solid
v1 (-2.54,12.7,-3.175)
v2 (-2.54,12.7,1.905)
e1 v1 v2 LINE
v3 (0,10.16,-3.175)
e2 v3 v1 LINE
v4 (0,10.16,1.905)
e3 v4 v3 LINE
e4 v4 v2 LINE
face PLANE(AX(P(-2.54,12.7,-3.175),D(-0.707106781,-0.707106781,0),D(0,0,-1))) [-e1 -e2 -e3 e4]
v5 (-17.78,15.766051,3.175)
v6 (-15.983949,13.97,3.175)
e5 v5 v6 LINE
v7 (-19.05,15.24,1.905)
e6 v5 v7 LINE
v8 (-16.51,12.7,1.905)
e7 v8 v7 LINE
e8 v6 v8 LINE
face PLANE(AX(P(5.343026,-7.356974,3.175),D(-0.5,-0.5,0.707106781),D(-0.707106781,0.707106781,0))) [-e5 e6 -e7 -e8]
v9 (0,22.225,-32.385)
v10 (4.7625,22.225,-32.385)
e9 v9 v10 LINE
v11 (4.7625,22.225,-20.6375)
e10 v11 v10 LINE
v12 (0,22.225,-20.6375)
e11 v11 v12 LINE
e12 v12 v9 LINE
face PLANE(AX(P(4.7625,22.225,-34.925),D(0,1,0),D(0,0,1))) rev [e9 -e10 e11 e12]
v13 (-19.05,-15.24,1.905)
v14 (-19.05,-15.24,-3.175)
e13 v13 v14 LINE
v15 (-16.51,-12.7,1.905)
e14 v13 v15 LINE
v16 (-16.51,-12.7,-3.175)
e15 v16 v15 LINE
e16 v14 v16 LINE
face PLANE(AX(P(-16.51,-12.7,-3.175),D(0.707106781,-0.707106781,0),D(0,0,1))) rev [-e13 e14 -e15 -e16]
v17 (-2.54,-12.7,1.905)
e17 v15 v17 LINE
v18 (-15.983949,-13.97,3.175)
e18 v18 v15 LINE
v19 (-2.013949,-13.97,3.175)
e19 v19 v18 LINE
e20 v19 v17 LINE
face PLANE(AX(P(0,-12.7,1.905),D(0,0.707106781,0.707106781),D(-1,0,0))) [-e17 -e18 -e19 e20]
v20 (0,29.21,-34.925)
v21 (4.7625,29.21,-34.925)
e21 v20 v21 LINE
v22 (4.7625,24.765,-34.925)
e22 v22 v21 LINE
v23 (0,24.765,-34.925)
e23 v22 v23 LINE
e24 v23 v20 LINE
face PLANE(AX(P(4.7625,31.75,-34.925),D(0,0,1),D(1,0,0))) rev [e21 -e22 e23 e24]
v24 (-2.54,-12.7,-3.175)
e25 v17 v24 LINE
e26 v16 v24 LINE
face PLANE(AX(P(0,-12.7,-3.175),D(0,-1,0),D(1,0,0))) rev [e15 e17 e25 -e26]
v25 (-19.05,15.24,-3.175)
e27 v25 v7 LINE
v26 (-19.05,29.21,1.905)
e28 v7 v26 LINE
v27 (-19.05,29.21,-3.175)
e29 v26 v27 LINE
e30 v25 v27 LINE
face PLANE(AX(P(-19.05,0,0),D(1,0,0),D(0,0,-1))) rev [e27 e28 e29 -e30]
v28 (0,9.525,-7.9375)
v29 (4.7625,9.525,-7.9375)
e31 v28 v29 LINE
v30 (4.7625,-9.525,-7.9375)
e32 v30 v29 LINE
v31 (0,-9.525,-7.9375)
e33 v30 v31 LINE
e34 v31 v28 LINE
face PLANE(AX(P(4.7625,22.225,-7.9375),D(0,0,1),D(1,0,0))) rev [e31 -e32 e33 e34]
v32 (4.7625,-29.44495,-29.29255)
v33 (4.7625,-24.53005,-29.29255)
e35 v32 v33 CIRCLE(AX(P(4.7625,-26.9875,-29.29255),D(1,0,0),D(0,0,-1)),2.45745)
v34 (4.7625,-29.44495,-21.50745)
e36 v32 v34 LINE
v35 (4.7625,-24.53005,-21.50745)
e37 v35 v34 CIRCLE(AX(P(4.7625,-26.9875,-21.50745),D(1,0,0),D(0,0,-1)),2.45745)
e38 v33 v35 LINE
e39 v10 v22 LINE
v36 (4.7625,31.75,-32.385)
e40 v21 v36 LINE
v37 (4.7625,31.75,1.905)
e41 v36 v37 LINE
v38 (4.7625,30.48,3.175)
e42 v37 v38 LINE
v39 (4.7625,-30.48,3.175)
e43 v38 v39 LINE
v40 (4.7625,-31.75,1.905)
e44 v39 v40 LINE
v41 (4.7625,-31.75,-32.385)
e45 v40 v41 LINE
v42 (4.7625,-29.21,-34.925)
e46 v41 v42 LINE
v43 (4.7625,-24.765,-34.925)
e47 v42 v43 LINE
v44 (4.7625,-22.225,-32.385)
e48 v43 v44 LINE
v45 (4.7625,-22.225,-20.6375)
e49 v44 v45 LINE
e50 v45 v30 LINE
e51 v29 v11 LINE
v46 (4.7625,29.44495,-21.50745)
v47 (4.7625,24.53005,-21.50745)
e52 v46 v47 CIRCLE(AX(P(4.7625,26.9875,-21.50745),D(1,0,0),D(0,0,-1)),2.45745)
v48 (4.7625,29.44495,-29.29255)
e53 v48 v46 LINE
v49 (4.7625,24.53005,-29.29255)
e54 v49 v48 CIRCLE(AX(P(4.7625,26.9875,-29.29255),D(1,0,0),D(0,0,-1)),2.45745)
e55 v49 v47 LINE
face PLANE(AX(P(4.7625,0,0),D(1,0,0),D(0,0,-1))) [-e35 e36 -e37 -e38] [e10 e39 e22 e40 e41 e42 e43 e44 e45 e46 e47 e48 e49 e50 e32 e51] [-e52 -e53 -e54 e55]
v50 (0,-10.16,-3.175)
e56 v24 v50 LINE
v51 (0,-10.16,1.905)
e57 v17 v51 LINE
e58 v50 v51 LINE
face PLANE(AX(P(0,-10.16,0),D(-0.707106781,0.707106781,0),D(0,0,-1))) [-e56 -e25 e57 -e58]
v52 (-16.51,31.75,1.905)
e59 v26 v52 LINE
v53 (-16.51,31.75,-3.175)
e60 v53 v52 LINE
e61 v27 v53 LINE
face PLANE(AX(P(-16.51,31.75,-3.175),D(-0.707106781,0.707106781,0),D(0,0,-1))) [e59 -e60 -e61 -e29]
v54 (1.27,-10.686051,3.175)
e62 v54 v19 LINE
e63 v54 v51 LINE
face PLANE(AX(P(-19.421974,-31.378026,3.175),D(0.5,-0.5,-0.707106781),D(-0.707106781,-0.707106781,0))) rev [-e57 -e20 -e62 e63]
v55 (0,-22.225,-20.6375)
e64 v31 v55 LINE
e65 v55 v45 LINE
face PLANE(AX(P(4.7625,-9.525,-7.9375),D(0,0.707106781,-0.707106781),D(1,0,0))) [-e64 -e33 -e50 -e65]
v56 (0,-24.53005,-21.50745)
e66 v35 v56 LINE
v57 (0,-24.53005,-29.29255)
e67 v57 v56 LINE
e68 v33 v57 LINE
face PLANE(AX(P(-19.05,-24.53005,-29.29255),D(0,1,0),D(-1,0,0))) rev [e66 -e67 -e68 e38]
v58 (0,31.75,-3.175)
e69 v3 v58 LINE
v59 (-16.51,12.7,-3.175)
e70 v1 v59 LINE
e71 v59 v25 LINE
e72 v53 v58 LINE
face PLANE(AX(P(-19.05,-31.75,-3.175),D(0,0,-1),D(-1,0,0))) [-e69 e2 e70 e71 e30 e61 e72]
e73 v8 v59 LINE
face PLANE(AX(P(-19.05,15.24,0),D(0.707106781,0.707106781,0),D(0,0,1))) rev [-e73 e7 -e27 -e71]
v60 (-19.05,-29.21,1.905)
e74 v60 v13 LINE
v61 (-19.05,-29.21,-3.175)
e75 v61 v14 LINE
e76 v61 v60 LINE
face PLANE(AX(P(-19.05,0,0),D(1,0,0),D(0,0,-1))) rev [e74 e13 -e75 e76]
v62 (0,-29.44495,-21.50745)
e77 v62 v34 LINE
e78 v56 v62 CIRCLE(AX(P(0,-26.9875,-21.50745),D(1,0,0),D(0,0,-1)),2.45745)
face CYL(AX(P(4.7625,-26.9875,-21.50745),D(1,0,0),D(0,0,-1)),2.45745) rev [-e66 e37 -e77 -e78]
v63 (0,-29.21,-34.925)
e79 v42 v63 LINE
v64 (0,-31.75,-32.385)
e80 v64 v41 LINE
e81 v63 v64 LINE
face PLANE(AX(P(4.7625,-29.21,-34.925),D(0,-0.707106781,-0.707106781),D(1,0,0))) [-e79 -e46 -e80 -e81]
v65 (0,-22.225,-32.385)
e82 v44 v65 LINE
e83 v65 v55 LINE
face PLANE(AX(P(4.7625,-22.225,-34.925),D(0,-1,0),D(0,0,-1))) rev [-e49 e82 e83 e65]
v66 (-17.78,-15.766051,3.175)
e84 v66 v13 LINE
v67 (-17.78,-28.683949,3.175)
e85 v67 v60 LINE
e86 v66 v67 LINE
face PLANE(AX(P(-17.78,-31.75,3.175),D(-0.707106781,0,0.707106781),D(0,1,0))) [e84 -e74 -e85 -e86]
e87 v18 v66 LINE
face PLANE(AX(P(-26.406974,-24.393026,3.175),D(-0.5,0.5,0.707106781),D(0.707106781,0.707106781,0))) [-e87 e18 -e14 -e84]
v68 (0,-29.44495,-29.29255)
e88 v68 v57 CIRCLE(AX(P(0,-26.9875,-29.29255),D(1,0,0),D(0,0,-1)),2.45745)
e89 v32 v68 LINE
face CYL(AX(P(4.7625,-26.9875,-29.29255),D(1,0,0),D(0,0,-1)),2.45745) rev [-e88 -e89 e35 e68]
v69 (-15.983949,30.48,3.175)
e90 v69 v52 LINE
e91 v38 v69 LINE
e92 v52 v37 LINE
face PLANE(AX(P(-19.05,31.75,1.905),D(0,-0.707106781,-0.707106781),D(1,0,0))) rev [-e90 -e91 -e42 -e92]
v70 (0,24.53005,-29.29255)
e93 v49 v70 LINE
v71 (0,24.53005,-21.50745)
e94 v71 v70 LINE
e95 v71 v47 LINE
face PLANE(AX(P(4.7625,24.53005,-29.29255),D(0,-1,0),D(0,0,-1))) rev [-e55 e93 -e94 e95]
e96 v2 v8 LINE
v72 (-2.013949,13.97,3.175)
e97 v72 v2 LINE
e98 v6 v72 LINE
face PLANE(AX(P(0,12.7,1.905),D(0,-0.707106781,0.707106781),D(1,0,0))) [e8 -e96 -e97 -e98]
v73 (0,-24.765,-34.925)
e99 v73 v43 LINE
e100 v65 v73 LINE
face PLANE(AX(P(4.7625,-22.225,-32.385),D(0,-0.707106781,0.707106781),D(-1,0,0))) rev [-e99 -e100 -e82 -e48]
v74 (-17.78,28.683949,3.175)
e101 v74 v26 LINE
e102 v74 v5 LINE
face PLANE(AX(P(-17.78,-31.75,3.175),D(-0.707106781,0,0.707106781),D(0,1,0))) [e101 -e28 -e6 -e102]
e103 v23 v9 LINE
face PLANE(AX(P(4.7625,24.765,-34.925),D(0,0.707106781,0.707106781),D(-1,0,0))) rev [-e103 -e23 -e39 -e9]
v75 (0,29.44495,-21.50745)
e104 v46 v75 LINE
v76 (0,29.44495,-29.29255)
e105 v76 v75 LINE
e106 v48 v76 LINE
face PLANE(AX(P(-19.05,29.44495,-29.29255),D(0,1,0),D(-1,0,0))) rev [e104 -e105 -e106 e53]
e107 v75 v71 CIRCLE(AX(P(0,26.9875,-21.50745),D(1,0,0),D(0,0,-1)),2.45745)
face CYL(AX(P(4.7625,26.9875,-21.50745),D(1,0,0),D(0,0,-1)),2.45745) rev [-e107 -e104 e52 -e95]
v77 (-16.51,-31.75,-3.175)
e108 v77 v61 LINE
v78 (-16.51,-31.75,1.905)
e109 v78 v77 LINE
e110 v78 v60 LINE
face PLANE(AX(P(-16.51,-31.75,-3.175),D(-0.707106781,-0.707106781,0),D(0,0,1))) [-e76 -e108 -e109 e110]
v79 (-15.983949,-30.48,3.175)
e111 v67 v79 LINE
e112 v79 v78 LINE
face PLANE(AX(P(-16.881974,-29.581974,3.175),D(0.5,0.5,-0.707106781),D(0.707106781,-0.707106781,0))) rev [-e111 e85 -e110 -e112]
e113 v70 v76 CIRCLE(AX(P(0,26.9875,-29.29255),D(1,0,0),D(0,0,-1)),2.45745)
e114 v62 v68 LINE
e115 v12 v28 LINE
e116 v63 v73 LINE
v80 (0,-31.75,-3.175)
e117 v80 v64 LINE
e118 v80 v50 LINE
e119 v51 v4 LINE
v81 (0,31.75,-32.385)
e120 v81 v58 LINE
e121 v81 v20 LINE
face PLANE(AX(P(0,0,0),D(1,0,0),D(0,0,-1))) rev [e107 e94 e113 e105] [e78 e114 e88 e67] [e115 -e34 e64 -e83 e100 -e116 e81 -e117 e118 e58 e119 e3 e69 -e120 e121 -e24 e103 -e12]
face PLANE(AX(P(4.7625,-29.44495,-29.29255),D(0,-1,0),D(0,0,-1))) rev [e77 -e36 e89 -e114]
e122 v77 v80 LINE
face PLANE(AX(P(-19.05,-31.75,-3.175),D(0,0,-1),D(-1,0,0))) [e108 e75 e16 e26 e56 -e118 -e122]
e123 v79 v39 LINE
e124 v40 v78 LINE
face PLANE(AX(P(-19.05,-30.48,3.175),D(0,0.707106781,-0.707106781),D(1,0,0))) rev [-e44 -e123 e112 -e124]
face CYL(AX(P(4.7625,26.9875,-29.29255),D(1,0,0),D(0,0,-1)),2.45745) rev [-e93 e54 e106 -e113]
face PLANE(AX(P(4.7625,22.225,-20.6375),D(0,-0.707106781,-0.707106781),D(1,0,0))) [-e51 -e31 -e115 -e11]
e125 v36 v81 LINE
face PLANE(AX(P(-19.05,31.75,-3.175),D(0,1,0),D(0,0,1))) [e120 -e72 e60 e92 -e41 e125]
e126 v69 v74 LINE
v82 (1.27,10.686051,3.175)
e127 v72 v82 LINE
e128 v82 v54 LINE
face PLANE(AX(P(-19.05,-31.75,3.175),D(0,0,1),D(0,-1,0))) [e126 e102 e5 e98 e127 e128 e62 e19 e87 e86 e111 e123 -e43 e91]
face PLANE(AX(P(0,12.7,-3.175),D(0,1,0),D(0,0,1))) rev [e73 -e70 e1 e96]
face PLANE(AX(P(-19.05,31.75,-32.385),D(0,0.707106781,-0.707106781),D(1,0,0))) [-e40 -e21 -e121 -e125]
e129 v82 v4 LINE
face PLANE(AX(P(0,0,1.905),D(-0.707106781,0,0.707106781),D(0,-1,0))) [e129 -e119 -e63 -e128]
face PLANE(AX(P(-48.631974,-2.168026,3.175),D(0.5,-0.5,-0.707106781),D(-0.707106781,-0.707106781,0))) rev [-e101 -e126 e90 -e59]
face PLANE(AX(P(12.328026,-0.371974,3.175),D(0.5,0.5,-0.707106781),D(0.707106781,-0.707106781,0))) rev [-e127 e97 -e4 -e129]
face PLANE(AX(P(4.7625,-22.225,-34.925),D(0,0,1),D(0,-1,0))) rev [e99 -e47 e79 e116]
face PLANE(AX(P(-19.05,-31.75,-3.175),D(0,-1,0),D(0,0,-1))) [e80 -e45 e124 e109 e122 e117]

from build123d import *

# Parameters (mm, degrees)
SKETCH1_W                 = 6.35
SKETCH1_H                 = 63.5
BOSS_EXTRUDE1_DEPTH       = 19.05
BOSS_EXTRUDE2_DEPTH       = 4.7625
SKETCH4_W                 = 19.05
SKETCH4_H                 = 25.4
CUT_EXTRUDE1_DEPTH        = 6.35
CHAMFER1_SIZE             = 12.7
CHAMFER2_SIZE             = 2.54
CHAMFER3_SIZE             = 1.27
F_8_CLEARANCE_SLOT1_DEPTH = 4.7625


# Read off the part's stored shape, not the designer's step: #8 Clearance Slot1
with BuildPart() as part:
    # Sketch1 → Boss-Extrude1 (new body)
    with BuildSketch(Plane(origin=(0, 0, 0), x_dir=(0, 0, -1), z_dir=(1, 0, 0))):
        Rectangle(SKETCH1_W, SKETCH1_H)
    extrude(amount=-BOSS_EXTRUDE1_DEPTH)

    # Sketch2 → Boss-Extrude2 (add)
    with BuildSketch(Plane(origin=(0, 0, 0), x_dir=(0, 0, -1), z_dir=(1, 0, 0))):
        Polygon((-3.175, 31.75), (34.925, 31.75), (34.925, 22.225), (7.9375, 22.225), (7.9375, -22.225), (34.925, -22.225), (34.925, -31.75), (-3.175, -31.75), align=None)
    extrude(amount=BOSS_EXTRUDE2_DEPTH)

    # Sketch4 → Cut-Extrude1 (cut)
    with BuildSketch(Plane.XY.offset(3.175)):
        with Locations((-9.525, 0)):
            Rectangle(SKETCH4_W, SKETCH4_H)
    extrude(amount=-CUT_EXTRUDE1_DEPTH, mode=Mode.SUBTRACT)

    # Chamfer1
    chamfer1_edges = [part.edges().sort_by_distance(p)[0] for p in [
        (2.38125, -22.225, -7.9375),
        (2.38125, 22.225, -7.9375),
    ]]
    chamfer(chamfer1_edges, length=CHAMFER1_SIZE)

    # Chamfer2
    chamfer2_edges = [part.edges().sort_by_distance(p)[0] for p in [
        (-19.05, 31.75, 0),
        (2.38125, -31.75, -34.925),
        (2.38125, -22.225, -34.925),
        (2.38125, 22.225, -34.925),
        (2.38125, 31.75, -34.925),
        (-19.05, -12.7, 0),
        (-19.05, 12.7, 0),
        (0, 12.7, 0),
        (0, -12.7, 0),
        (-19.05, -31.75, 0),
    ]]
    chamfer(chamfer2_edges, length=CHAMFER2_SIZE)

    # Chamfer3
    chamfer3_edges = [part.edges().sort_by_distance(p)[0] for p in [
        (-9.525, 12.7, 3.175),
        (0, 0, 3.175),
        (-9.525, -12.7, 3.175),
        (-19.05, -22.225, 3.175),
        (-5.87375, -31.75, 3.175),
        (-5.87375, 31.75, 3.175),
        (-19.05, 22.225, 3.175),
        (-17.78, 30.48, 3.175),
        (-17.78, -30.48, 3.175),
        (-17.78, 13.97, 3.175),
        (-17.78, -13.97, 3.175),
        (-1.27, 11.43, 3.175),
        (-1.27, -11.43, 3.175),
    ]]
    chamfer(chamfer3_edges, length=CHAMFER3_SIZE)

    # #8 Clearance Slot1 outline → #8 Clearance Slot1 (cut)
    with BuildSketch(Plane.YZ):
        with BuildLine():
            Line((-24.53005, -29.29255), (-24.53005, -21.50745))
            ThreePointArc((-24.53005, -21.50745), (-26.9875, -19.05), (-29.44495, -21.50745))
            Line((-29.44495, -21.50745), (-29.44495, -29.29255))
            ThreePointArc((-29.44495, -29.29255), (-26.9875, -31.75), (-24.53005, -29.29255))
        make_face()
        with BuildLine():
            Line((24.53005, -21.50745), (24.53005, -29.29255))
            ThreePointArc((24.53005, -29.29255), (26.9875, -31.75), (29.44495, -29.29255))
            Line((29.44495, -29.29255), (29.44495, -21.50745))
            ThreePointArc((29.44495, -21.50745), (26.9875, -19.05), (24.53005, -21.50745))
        make_face()
    extrude(amount=F_8_CLEARANCE_SLOT1_DEPTH, mode=Mode.SUBTRACT)


solid = part.part
